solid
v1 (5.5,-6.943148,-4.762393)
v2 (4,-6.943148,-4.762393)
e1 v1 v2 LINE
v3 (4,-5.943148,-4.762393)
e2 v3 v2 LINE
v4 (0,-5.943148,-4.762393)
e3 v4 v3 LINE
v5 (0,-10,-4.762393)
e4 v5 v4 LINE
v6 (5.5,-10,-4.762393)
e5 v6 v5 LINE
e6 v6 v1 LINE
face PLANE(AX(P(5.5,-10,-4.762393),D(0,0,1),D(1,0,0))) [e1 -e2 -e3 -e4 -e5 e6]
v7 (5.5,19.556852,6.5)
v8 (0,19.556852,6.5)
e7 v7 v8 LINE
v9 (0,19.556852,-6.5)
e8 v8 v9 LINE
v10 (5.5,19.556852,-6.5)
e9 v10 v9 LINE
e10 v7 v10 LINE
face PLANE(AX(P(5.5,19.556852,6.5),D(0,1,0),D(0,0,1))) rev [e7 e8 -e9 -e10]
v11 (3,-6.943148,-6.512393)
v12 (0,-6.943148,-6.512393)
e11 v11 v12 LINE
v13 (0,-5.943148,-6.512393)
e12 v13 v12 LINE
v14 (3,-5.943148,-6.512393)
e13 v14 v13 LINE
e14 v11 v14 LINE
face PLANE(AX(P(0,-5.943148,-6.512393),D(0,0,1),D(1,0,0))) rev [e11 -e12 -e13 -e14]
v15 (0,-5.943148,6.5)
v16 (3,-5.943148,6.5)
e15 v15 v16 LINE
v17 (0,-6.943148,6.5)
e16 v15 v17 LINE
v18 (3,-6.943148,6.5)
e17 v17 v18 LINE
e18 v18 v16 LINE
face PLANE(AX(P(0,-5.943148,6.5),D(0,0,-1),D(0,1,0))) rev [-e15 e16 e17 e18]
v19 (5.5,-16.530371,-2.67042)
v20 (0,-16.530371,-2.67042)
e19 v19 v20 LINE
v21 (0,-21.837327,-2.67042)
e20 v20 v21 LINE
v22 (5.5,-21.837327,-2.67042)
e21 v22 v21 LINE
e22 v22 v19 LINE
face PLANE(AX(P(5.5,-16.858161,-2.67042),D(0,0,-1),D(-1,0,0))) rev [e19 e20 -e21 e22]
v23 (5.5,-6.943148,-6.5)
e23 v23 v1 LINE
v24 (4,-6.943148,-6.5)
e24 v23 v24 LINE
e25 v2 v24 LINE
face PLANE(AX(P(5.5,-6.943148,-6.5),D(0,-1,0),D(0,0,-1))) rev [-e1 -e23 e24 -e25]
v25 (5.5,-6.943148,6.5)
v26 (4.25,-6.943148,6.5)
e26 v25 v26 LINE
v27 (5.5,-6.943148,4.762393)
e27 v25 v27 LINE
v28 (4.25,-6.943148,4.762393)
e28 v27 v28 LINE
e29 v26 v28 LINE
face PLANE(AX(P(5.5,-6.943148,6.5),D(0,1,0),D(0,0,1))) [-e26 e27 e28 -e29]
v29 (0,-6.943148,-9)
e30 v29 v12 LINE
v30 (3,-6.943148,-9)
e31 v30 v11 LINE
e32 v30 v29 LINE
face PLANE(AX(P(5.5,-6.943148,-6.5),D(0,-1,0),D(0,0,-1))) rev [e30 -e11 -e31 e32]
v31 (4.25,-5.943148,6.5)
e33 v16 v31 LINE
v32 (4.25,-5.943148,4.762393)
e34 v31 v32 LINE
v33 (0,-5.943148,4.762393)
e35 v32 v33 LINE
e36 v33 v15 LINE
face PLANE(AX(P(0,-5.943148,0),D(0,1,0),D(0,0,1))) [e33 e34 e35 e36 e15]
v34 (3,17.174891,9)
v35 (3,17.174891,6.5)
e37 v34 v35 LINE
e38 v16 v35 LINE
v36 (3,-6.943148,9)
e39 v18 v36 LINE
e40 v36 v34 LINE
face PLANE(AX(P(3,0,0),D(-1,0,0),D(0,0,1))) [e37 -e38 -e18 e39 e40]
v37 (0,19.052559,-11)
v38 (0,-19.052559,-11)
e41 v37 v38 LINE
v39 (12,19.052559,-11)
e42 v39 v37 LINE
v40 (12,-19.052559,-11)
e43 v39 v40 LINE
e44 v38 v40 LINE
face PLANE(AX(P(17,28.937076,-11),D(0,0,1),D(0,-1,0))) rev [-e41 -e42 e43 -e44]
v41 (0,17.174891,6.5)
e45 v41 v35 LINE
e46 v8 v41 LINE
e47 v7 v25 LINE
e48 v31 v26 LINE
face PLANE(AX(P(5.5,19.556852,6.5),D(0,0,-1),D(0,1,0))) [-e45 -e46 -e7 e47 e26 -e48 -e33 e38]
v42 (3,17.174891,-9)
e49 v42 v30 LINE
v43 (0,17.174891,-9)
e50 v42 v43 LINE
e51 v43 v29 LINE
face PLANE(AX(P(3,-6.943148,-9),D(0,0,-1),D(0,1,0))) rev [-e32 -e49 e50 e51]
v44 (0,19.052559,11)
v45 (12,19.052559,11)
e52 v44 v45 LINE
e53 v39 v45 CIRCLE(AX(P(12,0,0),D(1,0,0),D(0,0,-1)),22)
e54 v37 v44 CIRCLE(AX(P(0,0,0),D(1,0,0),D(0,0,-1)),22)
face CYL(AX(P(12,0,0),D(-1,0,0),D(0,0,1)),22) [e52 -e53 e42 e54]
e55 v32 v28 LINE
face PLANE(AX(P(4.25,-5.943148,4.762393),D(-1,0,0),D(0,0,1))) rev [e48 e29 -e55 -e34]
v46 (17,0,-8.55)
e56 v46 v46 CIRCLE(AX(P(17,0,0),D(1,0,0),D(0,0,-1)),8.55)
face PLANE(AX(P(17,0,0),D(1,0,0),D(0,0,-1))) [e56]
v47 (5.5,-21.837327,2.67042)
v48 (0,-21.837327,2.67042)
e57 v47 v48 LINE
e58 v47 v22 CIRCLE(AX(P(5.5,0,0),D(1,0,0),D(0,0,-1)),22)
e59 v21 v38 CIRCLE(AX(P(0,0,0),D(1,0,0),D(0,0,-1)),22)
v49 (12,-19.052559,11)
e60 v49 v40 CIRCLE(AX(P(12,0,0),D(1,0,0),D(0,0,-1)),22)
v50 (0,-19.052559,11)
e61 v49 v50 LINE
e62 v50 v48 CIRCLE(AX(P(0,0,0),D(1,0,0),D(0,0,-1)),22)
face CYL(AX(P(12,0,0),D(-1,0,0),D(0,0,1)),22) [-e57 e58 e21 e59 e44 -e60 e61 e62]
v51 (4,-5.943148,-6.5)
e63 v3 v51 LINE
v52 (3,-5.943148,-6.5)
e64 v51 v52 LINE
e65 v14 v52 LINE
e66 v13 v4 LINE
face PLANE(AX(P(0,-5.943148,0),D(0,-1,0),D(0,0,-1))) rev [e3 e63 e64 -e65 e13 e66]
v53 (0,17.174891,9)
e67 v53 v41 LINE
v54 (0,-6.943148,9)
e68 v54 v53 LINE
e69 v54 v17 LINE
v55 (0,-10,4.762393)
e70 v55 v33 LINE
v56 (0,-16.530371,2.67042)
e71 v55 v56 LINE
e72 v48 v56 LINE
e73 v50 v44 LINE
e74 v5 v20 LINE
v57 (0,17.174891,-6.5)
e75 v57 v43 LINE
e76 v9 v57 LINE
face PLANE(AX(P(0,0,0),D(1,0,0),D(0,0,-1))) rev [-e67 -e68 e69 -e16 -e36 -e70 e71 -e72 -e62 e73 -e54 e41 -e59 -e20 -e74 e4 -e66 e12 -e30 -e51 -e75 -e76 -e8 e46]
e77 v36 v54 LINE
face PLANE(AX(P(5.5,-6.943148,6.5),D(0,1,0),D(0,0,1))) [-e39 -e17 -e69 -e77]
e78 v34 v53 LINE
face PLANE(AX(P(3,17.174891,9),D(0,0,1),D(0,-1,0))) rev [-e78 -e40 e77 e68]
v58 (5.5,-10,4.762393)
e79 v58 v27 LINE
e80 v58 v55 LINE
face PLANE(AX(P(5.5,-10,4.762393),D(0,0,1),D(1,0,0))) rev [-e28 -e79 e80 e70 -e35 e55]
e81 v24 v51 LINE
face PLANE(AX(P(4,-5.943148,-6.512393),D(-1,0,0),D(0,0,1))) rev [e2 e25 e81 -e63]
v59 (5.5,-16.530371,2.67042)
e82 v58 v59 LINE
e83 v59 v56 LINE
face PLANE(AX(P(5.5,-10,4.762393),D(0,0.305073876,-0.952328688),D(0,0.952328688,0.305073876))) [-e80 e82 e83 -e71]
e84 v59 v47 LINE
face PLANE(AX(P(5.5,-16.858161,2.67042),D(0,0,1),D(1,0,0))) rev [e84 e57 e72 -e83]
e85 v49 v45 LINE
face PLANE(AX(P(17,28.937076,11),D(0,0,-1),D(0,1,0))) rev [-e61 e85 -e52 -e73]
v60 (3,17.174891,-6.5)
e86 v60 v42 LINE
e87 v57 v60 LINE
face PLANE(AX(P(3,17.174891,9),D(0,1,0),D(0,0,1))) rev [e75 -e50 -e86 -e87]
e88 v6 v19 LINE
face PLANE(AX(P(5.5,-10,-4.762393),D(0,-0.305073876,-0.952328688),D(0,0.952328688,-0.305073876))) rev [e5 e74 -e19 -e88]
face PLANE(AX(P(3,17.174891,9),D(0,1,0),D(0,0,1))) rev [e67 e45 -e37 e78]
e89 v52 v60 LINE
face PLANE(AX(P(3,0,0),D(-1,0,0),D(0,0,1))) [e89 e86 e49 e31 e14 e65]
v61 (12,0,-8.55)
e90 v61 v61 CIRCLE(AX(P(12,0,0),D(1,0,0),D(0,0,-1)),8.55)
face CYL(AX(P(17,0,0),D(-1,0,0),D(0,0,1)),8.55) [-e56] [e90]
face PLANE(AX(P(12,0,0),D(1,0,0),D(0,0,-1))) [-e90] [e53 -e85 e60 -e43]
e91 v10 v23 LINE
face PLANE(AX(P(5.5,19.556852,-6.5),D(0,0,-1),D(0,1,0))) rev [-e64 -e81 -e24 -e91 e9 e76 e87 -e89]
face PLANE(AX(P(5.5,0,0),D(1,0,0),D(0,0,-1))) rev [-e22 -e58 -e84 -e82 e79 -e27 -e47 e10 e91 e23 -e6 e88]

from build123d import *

# Parameters (mm, degrees)
SKETCH1_R           = 22
BOSS_EXTRUDE1_DEPTH = 12
CUT_EXTRUDE2_DEPTH  = 5.5
SKETCH15_W          = 18
SKETCH15_H          = 24.118038922
CUT_EXTRUDE3_DEPTH  = 3
SKETCH16_R          = 8.55
BOSS_EXTRUDE2_DEPTH = 5
SKETCH17_W          = 4
SKETCH17_H          = 1.75
BOSS_EXTRUDE3_DEPTH = 1
SKETCH18_W          = 4.25
SKETCH18_H          = 1.737607108
BOSS_EXTRUDE4_DEPTH = 1
CUT_EXTRUDE4_DEPTH  = 12


# Read off the part's stored shape, not the designer's step: Cut-Extrude4
with BuildPart() as part:
    # Sketch1 → Boss-Extrude1 (new body)
    with BuildSketch(Plane(origin=(0, 0, 0), x_dir=(0, 0, -1), z_dir=(1, 0, 0))):
        Circle(SKETCH1_R)
    extrude(amount=BOSS_EXTRUDE1_DEPTH)

    # Sketch13 → Cut-Extrude2 (cut)
    with BuildSketch(Plane(origin=(0, 0, 0), x_dir=(0, 0, -1), z_dir=(1, 0, 0))):
        with BuildLine():
            Line((-2.670420152, -16.85816067), (-2.670420152, -16.530371213))
            Line((-2.670420152, -16.530371213), (-4.762392892, -10))
            Line((-4.762392892, -10), (-4.762392892, -6.943148259))
            Line((-4.762392892, -6.943148259), (-6.5, -6.943148259))
            Line((-6.5, -6.943148259), (-6.5, 19.556851741))
            Line((-6.5, 19.556851741), (6.5, 19.556851741))
            Line((6.5, 19.556851741), (6.5, -6.943148259))
            Line((6.5, -6.943148259), (4.762392892, -6.943148259))
            Line((4.762392892, -6.943148259), (4.762392892, -10))
            Line((4.762392892, -10), (2.670420152, -16.530371213))
            Line((2.670420152, -16.530371213), (2.670420152, -16.85816067))
            Line((2.670420152, -16.85816067), (2.670420152, -21.837327131))
            ThreePointArc((2.670420152, -21.837327131), (1.836835043, -21.92318492), (1.000584871, -21.977234355))
            Line((1.000584871, -21.977234355), (0, -25.25))
            Line((0, -25.25), (-1.000584871, -21.977234355))
            ThreePointArc((-1.000584871, -21.977234355), (-1.836835043, -21.92318492), (-2.670420152, -21.837327131))
            Line((-2.670420152, -21.837327131), (-2.670420152, -16.85816067))
        make_face()
    extrude(amount=CUT_EXTRUDE2_DEPTH, mode=Mode.SUBTRACT)

    # Sketch15 → Cut-Extrude3 (cut)
    with BuildSketch(Plane.ZY):
        with Locations((0, 5.115871202)):
            Rectangle(SKETCH15_W, SKETCH15_H)
    extrude(amount=-CUT_EXTRUDE3_DEPTH, mode=Mode.SUBTRACT)

    # Sketch16 → Boss-Extrude2 (add)
    with BuildSketch(Plane(origin=(12, 0, 0), x_dir=(0, 0, -1), z_dir=(1, 0, 0))):
        Circle(SKETCH16_R)
    extrude(amount=BOSS_EXTRUDE2_DEPTH)

    # Sketch17 → Boss-Extrude3 (add)
    with BuildSketch(Plane(origin=(0, -6.943148259, 0), x_dir=(1, 0, 0), z_dir=(0, 1, 0))):
        with Locations((2, 5.637392892)):
            Rectangle(SKETCH17_W, SKETCH17_H)
    extrude(amount=BOSS_EXTRUDE3_DEPTH)

    # Sketch18 → Boss-Extrude4 (add)
    with BuildSketch(Plane(origin=(0, -6.943148259, 0), x_dir=(1, 0, 0), z_dir=(0, 1, 0))):
        with Locations((2.125, -5.631196446)):
            Rectangle(SKETCH18_W, SKETCH18_H)
    extrude(amount=BOSS_EXTRUDE4_DEPTH)

    # Cut-Extrude4 outline → Cut-Extrude4 (cut)
    with BuildSketch(Plane(origin=(0, 0, 0), x_dir=(0, 0, -1), z_dir=(1, 0, 0))):
        with BuildLine():
            ThreePointArc((11, -19.052558883), (22, 0), (11, 19.052558883))
            Line((11, 19.052558883), (11, -19.052558883))
        make_face()
        with BuildLine():
            Line((-11, -19.052558883), (-11, 19.052558883))
            ThreePointArc((-11, 19.052558883), (-22, 0), (-11, -19.052558883))
        make_face()
    extrude(amount=CUT_EXTRUDE4_DEPTH, mode=Mode.SUBTRACT)


solid = part.part
